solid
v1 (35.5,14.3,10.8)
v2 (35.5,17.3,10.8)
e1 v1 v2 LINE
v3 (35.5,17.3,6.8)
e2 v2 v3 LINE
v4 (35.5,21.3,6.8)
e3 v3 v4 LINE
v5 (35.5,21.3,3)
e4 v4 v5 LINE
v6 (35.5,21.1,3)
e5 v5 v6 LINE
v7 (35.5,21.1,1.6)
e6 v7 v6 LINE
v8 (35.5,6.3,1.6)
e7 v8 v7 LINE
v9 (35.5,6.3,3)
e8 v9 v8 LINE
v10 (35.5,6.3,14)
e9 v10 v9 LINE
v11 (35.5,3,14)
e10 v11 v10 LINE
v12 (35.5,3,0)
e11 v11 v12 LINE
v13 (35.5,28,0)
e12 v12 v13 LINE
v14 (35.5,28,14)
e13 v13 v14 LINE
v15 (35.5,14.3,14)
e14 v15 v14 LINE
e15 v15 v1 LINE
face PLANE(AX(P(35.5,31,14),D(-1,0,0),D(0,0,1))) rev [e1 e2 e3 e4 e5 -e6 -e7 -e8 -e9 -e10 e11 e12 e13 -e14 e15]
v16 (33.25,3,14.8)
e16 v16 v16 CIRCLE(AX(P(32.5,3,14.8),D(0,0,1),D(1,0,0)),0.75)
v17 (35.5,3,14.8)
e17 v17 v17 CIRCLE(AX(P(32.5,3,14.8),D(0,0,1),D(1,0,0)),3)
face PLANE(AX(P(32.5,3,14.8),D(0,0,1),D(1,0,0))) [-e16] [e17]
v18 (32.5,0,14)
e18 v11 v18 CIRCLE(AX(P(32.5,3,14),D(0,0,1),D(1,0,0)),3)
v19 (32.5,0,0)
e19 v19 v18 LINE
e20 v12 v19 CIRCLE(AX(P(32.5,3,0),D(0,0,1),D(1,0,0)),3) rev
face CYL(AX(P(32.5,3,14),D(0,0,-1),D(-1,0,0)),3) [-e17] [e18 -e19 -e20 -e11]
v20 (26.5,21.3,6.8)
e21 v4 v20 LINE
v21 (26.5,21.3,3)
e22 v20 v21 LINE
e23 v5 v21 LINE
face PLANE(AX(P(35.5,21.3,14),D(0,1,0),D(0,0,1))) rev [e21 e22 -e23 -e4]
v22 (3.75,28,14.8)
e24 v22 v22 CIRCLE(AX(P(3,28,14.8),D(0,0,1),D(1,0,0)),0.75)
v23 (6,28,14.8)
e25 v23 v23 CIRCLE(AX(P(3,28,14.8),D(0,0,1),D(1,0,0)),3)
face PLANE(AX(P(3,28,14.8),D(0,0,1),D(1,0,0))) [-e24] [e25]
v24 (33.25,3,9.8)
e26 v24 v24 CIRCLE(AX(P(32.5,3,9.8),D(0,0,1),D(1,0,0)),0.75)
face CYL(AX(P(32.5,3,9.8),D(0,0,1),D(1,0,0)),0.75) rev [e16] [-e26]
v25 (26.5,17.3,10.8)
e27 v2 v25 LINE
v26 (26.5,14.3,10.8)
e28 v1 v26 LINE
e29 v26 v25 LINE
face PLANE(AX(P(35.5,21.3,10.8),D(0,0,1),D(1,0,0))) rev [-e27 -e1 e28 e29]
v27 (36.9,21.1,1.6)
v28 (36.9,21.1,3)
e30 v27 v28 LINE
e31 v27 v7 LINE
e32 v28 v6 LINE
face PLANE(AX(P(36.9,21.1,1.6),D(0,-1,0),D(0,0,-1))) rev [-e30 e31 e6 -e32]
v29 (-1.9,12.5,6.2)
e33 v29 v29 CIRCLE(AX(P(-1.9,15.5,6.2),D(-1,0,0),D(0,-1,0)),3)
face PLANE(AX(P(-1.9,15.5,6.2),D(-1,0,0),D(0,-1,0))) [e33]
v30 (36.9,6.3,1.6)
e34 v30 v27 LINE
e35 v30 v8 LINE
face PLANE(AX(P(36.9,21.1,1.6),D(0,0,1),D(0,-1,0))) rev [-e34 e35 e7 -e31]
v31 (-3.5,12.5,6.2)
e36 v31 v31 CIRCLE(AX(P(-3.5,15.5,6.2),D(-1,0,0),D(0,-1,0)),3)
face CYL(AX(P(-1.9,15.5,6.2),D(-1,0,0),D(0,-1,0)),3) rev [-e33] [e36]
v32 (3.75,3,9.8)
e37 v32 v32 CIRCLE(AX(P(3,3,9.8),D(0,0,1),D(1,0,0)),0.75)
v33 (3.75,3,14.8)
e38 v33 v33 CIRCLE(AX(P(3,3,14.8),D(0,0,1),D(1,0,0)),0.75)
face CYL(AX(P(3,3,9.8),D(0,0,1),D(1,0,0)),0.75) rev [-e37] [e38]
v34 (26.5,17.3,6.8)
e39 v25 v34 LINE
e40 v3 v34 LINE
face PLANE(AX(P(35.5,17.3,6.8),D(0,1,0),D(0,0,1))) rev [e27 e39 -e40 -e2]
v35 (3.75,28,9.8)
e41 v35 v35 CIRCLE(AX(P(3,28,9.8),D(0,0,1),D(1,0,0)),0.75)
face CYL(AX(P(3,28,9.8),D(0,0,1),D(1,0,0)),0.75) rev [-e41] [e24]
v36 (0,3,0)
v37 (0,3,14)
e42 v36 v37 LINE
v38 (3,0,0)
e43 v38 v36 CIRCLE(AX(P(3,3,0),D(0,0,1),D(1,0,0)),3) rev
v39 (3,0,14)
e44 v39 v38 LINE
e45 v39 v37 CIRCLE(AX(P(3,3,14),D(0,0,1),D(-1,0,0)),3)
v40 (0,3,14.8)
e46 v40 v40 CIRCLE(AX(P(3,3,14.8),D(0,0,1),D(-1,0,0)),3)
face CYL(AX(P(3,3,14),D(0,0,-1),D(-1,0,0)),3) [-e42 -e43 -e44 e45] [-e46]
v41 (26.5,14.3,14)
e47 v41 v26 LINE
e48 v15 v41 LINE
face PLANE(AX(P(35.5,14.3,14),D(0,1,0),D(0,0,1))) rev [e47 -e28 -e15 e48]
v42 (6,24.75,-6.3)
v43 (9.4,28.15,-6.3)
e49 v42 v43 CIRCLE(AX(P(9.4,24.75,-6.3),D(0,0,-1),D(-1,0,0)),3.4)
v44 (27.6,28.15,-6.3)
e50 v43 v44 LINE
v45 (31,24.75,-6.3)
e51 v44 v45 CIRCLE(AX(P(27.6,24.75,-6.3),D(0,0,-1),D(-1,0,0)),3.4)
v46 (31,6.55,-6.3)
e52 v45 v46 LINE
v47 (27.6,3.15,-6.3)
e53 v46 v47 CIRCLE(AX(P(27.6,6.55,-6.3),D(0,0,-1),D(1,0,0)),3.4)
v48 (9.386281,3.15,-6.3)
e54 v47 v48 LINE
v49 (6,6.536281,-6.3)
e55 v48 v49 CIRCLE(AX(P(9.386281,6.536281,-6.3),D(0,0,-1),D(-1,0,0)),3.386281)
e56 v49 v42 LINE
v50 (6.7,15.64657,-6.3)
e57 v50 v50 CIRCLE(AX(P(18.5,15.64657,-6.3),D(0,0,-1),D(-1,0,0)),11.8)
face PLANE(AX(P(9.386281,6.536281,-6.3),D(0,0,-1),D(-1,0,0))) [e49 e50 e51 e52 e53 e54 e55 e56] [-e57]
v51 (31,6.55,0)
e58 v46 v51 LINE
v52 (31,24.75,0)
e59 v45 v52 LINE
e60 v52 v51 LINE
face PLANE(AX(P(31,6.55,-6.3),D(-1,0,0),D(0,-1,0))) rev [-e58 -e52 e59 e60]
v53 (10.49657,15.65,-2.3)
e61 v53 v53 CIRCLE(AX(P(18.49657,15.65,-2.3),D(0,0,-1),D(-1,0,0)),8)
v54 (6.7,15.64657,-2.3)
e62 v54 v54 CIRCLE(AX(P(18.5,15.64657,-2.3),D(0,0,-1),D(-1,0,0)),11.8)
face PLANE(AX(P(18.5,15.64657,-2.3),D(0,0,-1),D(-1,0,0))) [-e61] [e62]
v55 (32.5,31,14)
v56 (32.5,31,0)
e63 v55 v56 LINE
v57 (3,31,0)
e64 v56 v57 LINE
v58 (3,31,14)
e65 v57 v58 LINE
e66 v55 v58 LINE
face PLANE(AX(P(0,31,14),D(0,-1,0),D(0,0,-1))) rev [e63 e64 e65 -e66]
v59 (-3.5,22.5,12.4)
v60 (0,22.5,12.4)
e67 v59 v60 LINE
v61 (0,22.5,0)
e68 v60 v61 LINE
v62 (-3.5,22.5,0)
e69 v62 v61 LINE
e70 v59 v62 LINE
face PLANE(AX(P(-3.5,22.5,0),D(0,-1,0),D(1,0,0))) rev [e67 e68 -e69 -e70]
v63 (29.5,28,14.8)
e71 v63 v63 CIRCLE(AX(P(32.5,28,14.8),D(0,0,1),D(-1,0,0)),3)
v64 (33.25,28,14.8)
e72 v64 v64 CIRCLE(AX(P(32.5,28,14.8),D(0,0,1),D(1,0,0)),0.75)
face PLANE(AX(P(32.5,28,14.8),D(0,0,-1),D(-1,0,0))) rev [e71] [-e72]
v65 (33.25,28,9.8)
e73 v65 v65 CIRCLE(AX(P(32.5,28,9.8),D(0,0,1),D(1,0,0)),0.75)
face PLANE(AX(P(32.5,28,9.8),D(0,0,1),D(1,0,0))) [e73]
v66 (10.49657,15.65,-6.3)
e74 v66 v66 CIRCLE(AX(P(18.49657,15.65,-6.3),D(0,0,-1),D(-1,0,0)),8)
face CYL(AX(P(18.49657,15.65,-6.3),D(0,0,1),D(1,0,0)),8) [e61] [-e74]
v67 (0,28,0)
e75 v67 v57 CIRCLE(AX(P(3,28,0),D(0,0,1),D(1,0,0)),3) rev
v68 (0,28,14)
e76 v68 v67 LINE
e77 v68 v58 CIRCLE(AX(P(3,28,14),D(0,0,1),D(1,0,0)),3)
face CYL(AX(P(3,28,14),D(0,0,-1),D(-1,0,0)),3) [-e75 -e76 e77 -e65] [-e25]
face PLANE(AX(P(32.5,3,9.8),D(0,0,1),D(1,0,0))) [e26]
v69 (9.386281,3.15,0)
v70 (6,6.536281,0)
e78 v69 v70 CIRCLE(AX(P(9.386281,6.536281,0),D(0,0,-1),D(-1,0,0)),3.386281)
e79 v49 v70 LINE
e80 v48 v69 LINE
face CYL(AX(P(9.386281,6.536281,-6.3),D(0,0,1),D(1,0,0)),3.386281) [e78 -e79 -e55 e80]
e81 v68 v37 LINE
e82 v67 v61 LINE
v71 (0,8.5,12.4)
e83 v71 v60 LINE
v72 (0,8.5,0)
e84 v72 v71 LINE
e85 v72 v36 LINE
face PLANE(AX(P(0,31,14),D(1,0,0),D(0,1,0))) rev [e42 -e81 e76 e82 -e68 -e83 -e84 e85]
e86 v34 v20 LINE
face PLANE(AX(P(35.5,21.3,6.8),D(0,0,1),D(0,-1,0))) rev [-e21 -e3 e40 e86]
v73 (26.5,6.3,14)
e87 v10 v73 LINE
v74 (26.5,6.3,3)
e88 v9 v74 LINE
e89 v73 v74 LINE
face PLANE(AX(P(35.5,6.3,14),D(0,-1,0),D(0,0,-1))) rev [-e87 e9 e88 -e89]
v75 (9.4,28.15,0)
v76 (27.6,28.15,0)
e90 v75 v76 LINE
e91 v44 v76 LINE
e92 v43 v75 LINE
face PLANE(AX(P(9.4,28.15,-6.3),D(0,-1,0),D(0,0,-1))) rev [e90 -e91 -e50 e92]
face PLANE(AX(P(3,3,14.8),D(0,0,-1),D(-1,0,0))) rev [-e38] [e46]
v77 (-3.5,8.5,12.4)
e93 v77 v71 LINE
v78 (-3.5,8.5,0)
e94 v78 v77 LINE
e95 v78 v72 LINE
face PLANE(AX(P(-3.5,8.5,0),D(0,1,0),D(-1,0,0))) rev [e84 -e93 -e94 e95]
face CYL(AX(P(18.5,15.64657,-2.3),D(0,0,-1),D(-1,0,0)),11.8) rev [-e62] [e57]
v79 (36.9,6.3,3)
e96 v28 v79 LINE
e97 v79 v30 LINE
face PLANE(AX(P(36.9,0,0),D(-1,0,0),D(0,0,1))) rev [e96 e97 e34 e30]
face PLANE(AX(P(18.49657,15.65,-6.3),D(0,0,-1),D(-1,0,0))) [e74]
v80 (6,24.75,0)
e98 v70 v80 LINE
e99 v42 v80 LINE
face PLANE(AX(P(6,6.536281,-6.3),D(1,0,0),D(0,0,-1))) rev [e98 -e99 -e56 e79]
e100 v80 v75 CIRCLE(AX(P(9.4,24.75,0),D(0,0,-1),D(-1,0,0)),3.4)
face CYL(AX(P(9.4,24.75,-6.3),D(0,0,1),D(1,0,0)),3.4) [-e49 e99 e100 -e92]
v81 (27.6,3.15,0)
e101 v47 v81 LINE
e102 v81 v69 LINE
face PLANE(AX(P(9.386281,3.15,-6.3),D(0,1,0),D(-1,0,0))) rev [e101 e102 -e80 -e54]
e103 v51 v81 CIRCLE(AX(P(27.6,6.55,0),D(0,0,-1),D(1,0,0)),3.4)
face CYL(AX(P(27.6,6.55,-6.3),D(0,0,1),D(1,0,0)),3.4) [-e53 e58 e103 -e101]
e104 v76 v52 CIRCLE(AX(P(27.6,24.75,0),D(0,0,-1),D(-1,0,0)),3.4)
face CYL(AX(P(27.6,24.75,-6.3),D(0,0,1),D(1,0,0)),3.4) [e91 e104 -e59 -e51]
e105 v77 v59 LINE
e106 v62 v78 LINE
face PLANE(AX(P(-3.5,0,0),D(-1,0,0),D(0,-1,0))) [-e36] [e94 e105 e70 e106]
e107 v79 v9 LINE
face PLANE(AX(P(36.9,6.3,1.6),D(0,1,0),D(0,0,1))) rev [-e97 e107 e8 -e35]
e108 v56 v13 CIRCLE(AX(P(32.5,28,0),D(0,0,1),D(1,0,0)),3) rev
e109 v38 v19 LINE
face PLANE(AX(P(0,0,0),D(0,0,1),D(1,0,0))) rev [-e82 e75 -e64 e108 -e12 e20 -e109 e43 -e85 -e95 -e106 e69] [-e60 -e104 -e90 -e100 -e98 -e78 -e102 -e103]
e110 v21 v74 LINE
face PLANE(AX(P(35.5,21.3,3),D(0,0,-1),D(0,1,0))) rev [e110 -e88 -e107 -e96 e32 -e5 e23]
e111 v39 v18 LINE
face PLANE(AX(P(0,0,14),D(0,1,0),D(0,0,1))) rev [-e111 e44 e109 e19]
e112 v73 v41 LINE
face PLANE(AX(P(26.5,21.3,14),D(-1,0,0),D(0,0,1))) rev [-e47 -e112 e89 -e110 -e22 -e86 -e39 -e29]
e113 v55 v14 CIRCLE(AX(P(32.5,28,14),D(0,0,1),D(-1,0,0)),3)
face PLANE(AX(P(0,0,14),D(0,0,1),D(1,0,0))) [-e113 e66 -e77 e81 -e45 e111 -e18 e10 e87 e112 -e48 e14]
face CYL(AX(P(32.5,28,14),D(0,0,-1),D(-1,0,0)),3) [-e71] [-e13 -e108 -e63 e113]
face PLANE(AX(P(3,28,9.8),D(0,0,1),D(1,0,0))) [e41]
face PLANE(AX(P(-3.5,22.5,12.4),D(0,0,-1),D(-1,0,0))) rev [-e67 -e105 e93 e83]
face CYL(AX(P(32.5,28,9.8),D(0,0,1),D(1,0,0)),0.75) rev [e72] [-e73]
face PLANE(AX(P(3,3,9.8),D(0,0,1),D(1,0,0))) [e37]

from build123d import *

# Parameters (mm, degrees)
BOSS_EXTRUDE1_DEPTH  = 14
BOSS_EXTRUDE5_DEPTH  = 3.5
SKETCH11_R           = 2.9999999999999982
BOSS_EXTRUDE6_DEPTH  = 1.5
SKETCH11_2_R         = 2.9999999999999982
CUT_EXTRUDE1_DEPTH   = 1.6
BOSS_EXTRUDE7_DEPTH  = 9
BOSS_EXTRUDE8_DEPTH  = 9
FILLET1_R            = 3
BOSS_EXTRUDE10_START = 0.8
SKETCH15_R           = 3.0000000000000013
SKETCH15_R_2         = 3
SKETCH15_R_3         = 3.0000000000000004
SKETCH15_R_4         = 3.0000000000000018
BOSS_EXTRUDE10_DEPTH = 0.8
SKETCH16_R           = 0.7500000000000009
SKETCH16_R_2         = 0.7500000000000007
SKETCH16_R_3         = 0.7499999999999986
SKETCH16_R_4         = 0.7499999999999987
CUT_EXTRUDE2_DEPTH   = 5
SKETCH17_W           = 3.999999999999999
SKETCH17_H           = 4
BOSS_EXTRUDE11_DEPTH = 9
BOSS_EXTRUDE12_DEPTH = 6.3
SKETCH19_R           = 11.800000000000002
CUT_EXTRUDE3_DEPTH   = 4
SKETCH20_R           = 8.000000000000002
BOSS_EXTRUDE13_DEPTH = 4
BOSS_EXTRUDE14_DEPTH = 1.4


with BuildPart() as part:
    # Sketch1 → Boss-Extrude1 (new body)
    with BuildSketch(Plane.XY):
        Polygon((0, 0), (35.5, 0), (35.5, 6.3), (26.499999999999996, 6.3), (26.499999999999996, 21.3), (35.5, 21.3), (35.5, 31.000000000000004), (-3.83e-15, 31.000000000000004), align=None)
    extrude(amount=BOSS_EXTRUDE1_DEPTH)

    # Sketch10 → Boss-Extrude5 (add)
    with BuildSketch(Plane.ZY):
        Polygon((0, 22.500000000000004), (12.4, 22.500000000000004), (12.4, 8.500000000000002), (1.71e-15, 8.500000000000002), align=None)
    extrude(amount=BOSS_EXTRUDE5_DEPTH)

    # Sketch11 → Boss-Extrude6 (add)
    with BuildSketch(Plane.ZY.offset(3.5)):
        with Locations((6.200000000000002, 15.500000000000004)):
            Circle(SKETCH11_R)
    extrude(amount=-BOSS_EXTRUDE6_DEPTH)

    # Sketch11<2> → Cut-Extrude1 (cut)
    with BuildSketch(Plane.ZY.offset(3.5)):
        with Locations((6.200000000000002, 15.500000000000004)):
            Circle(SKETCH11_2_R)
    extrude(amount=-CUT_EXTRUDE1_DEPTH, mode=Mode.SUBTRACT)

    # Sketch12 → Boss-Extrude7 (add)
    with BuildSketch(Plane(origin=(26.499999999999996, 0, 0), x_dir=(0, 0, -1), z_dir=(1, 0, 0))):
        Polygon((0, 21.3), (-3, 21.3), (-2.999999999999999, 6.299999999999998), (-6.6e-16, 6.299999999999998), align=None)
    extrude(amount=BOSS_EXTRUDE7_DEPTH)

    # Sketch13 → Boss-Extrude8 (add)
    with BuildSketch(Plane(origin=(26.499999999999996, 0, 0), x_dir=(0, 0, -1), z_dir=(1, 0, 0))):
        Polygon((-14, 21.3), (-10.800000000000002, 21.3), (-10.800000000000002, 14.300000000000002), (-14.000000000000002, 14.3), align=None)
    extrude(amount=BOSS_EXTRUDE8_DEPTH)

    # Fillet1
    fillet1_edges = [part.edges().sort_by_distance(p)[0] for p in [
        (0, 0, 7),
        (35.5, 0, 7),
        (35.5, 31.000000000000004, 7),
        (-3.83e-15, 31.000000000000004, 7),
    ]]
    fillet(fillet1_edges, radius=FILLET1_R)

    # Sketch15 → Boss-Extrude10 (add)
    with BuildSketch(Plane.XY.offset(14).offset(BOSS_EXTRUDE10_START)):
        with Locations((32.49999999999999, 2.999999999999999)):
            Circle(SKETCH15_R)
        with Locations((2.999999999999999, 3)):
            Circle(SKETCH15_R_2)
        with Locations((2.9999999999999964, 28.000000000000004)):
            Circle(SKETCH15_R_3)
        with Locations((32.49999999999999, 28.000000000000004)):
            Circle(SKETCH15_R_4)
    extrude(amount=-BOSS_EXTRUDE10_DEPTH)

    # Sketch16 → Cut-Extrude2 (cut)
    with BuildSketch(Plane.XY.offset(14.8)):
        with Locations((2.9999999999999964, 28.000000000000004)):
            Circle(SKETCH16_R)
        with Locations((2.999999999999999, 3)):
            Circle(SKETCH16_R_2)
        with Locations((32.49999999999999, 2.999999999999999)):
            Circle(SKETCH16_R_3)
        with Locations((32.49999999999999, 28.000000000000004)):
            Circle(SKETCH16_R_4)
    extrude(amount=-CUT_EXTRUDE2_DEPTH, mode=Mode.SUBTRACT)

    # Sketch17 → Boss-Extrude11 (add)
    with BuildSketch(Plane(origin=(26.499999999999996, 0, 0), x_dir=(0, 0, -1), z_dir=(1, 0, 0))):
        with Locations((-8.800000000000002, 19.3)):
            Rectangle(SKETCH17_W, SKETCH17_H)
    extrude(amount=BOSS_EXTRUDE11_DEPTH)

    # Sketch18 → Boss-Extrude12 (add)
    with BuildSketch(Plane(origin=(0, 0, 0), x_dir=(-1, 0, 0), z_dir=(0, 0, -1))):
        with BuildLine():
            Line((-9.386280913258961, 3.15), (-27.599999999999998, 3.1499999999999964))
            ThreePointArc((-27.599999999999998, 3.1499999999999964), (-30.00416305603426, 4.145836943965737), (-30.999999999999996, 6.549999999999997))
            Line((-30.999999999999996, 6.549999999999997), (-30.999999999999993, 24.749999999999996))
            ThreePointArc((-30.999999999999993, 24.749999999999996), (-30.00416305603426, 27.154163056034264), (-27.599999999999994, 28.150000000000002))
            Line((-27.599999999999994, 28.150000000000002), (-9.399999999999995, 28.150000000000002))
            ThreePointArc((-9.399999999999995, 28.150000000000002), (-6.995836943965732, 27.154163056034264), (-5.999999999999993, 24.75))
            Line((-5.999999999999993, 24.75), (-5.999999999999993, 6.53628091325897))
            ThreePointArc((-5.999999999999993, 6.53628091325897), (-6.991818716490969, 4.141818716490977), (-9.386280913258961, 3.15))
        make_face()
    extrude(amount=BOSS_EXTRUDE12_DEPTH)

    # Sketch19 → Cut-Extrude3 (cut)
    with BuildSketch(Plane(origin=(0, 0, -6.3), x_dir=(-1, 0, 0), z_dir=(0, 0, -1))):
        with Locations((-18.499999999999993, 15.64657022831474)):
            Circle(SKETCH19_R)
    extrude(amount=-CUT_EXTRUDE3_DEPTH, mode=Mode.SUBTRACT)

    # Sketch20 → Boss-Extrude13 (add)
    with BuildSketch(Plane(origin=(0, 0, -2.3), x_dir=(-1, 0, 0), z_dir=(0, 0, -1))):
        with Locations((-18.496570228314738, 15.649999999999997)):
            Circle(SKETCH20_R)
    extrude(amount=BOSS_EXTRUDE13_DEPTH)

    # Sketch23 → Boss-Extrude14 (add)
    with BuildSketch(Plane(origin=(35.5, 0, 0), x_dir=(0, 0, -1), z_dir=(1, 0, 0))):
        Polygon((-1.600000000000001, 21.1), (-3.000000000000001, 21.1), (-2.999999999999999, 6.300000000000002), (-1.5999999999999992, 6.300000000000002), align=None)
    extrude(amount=BOSS_EXTRUDE14_DEPTH)


solid = part.part
